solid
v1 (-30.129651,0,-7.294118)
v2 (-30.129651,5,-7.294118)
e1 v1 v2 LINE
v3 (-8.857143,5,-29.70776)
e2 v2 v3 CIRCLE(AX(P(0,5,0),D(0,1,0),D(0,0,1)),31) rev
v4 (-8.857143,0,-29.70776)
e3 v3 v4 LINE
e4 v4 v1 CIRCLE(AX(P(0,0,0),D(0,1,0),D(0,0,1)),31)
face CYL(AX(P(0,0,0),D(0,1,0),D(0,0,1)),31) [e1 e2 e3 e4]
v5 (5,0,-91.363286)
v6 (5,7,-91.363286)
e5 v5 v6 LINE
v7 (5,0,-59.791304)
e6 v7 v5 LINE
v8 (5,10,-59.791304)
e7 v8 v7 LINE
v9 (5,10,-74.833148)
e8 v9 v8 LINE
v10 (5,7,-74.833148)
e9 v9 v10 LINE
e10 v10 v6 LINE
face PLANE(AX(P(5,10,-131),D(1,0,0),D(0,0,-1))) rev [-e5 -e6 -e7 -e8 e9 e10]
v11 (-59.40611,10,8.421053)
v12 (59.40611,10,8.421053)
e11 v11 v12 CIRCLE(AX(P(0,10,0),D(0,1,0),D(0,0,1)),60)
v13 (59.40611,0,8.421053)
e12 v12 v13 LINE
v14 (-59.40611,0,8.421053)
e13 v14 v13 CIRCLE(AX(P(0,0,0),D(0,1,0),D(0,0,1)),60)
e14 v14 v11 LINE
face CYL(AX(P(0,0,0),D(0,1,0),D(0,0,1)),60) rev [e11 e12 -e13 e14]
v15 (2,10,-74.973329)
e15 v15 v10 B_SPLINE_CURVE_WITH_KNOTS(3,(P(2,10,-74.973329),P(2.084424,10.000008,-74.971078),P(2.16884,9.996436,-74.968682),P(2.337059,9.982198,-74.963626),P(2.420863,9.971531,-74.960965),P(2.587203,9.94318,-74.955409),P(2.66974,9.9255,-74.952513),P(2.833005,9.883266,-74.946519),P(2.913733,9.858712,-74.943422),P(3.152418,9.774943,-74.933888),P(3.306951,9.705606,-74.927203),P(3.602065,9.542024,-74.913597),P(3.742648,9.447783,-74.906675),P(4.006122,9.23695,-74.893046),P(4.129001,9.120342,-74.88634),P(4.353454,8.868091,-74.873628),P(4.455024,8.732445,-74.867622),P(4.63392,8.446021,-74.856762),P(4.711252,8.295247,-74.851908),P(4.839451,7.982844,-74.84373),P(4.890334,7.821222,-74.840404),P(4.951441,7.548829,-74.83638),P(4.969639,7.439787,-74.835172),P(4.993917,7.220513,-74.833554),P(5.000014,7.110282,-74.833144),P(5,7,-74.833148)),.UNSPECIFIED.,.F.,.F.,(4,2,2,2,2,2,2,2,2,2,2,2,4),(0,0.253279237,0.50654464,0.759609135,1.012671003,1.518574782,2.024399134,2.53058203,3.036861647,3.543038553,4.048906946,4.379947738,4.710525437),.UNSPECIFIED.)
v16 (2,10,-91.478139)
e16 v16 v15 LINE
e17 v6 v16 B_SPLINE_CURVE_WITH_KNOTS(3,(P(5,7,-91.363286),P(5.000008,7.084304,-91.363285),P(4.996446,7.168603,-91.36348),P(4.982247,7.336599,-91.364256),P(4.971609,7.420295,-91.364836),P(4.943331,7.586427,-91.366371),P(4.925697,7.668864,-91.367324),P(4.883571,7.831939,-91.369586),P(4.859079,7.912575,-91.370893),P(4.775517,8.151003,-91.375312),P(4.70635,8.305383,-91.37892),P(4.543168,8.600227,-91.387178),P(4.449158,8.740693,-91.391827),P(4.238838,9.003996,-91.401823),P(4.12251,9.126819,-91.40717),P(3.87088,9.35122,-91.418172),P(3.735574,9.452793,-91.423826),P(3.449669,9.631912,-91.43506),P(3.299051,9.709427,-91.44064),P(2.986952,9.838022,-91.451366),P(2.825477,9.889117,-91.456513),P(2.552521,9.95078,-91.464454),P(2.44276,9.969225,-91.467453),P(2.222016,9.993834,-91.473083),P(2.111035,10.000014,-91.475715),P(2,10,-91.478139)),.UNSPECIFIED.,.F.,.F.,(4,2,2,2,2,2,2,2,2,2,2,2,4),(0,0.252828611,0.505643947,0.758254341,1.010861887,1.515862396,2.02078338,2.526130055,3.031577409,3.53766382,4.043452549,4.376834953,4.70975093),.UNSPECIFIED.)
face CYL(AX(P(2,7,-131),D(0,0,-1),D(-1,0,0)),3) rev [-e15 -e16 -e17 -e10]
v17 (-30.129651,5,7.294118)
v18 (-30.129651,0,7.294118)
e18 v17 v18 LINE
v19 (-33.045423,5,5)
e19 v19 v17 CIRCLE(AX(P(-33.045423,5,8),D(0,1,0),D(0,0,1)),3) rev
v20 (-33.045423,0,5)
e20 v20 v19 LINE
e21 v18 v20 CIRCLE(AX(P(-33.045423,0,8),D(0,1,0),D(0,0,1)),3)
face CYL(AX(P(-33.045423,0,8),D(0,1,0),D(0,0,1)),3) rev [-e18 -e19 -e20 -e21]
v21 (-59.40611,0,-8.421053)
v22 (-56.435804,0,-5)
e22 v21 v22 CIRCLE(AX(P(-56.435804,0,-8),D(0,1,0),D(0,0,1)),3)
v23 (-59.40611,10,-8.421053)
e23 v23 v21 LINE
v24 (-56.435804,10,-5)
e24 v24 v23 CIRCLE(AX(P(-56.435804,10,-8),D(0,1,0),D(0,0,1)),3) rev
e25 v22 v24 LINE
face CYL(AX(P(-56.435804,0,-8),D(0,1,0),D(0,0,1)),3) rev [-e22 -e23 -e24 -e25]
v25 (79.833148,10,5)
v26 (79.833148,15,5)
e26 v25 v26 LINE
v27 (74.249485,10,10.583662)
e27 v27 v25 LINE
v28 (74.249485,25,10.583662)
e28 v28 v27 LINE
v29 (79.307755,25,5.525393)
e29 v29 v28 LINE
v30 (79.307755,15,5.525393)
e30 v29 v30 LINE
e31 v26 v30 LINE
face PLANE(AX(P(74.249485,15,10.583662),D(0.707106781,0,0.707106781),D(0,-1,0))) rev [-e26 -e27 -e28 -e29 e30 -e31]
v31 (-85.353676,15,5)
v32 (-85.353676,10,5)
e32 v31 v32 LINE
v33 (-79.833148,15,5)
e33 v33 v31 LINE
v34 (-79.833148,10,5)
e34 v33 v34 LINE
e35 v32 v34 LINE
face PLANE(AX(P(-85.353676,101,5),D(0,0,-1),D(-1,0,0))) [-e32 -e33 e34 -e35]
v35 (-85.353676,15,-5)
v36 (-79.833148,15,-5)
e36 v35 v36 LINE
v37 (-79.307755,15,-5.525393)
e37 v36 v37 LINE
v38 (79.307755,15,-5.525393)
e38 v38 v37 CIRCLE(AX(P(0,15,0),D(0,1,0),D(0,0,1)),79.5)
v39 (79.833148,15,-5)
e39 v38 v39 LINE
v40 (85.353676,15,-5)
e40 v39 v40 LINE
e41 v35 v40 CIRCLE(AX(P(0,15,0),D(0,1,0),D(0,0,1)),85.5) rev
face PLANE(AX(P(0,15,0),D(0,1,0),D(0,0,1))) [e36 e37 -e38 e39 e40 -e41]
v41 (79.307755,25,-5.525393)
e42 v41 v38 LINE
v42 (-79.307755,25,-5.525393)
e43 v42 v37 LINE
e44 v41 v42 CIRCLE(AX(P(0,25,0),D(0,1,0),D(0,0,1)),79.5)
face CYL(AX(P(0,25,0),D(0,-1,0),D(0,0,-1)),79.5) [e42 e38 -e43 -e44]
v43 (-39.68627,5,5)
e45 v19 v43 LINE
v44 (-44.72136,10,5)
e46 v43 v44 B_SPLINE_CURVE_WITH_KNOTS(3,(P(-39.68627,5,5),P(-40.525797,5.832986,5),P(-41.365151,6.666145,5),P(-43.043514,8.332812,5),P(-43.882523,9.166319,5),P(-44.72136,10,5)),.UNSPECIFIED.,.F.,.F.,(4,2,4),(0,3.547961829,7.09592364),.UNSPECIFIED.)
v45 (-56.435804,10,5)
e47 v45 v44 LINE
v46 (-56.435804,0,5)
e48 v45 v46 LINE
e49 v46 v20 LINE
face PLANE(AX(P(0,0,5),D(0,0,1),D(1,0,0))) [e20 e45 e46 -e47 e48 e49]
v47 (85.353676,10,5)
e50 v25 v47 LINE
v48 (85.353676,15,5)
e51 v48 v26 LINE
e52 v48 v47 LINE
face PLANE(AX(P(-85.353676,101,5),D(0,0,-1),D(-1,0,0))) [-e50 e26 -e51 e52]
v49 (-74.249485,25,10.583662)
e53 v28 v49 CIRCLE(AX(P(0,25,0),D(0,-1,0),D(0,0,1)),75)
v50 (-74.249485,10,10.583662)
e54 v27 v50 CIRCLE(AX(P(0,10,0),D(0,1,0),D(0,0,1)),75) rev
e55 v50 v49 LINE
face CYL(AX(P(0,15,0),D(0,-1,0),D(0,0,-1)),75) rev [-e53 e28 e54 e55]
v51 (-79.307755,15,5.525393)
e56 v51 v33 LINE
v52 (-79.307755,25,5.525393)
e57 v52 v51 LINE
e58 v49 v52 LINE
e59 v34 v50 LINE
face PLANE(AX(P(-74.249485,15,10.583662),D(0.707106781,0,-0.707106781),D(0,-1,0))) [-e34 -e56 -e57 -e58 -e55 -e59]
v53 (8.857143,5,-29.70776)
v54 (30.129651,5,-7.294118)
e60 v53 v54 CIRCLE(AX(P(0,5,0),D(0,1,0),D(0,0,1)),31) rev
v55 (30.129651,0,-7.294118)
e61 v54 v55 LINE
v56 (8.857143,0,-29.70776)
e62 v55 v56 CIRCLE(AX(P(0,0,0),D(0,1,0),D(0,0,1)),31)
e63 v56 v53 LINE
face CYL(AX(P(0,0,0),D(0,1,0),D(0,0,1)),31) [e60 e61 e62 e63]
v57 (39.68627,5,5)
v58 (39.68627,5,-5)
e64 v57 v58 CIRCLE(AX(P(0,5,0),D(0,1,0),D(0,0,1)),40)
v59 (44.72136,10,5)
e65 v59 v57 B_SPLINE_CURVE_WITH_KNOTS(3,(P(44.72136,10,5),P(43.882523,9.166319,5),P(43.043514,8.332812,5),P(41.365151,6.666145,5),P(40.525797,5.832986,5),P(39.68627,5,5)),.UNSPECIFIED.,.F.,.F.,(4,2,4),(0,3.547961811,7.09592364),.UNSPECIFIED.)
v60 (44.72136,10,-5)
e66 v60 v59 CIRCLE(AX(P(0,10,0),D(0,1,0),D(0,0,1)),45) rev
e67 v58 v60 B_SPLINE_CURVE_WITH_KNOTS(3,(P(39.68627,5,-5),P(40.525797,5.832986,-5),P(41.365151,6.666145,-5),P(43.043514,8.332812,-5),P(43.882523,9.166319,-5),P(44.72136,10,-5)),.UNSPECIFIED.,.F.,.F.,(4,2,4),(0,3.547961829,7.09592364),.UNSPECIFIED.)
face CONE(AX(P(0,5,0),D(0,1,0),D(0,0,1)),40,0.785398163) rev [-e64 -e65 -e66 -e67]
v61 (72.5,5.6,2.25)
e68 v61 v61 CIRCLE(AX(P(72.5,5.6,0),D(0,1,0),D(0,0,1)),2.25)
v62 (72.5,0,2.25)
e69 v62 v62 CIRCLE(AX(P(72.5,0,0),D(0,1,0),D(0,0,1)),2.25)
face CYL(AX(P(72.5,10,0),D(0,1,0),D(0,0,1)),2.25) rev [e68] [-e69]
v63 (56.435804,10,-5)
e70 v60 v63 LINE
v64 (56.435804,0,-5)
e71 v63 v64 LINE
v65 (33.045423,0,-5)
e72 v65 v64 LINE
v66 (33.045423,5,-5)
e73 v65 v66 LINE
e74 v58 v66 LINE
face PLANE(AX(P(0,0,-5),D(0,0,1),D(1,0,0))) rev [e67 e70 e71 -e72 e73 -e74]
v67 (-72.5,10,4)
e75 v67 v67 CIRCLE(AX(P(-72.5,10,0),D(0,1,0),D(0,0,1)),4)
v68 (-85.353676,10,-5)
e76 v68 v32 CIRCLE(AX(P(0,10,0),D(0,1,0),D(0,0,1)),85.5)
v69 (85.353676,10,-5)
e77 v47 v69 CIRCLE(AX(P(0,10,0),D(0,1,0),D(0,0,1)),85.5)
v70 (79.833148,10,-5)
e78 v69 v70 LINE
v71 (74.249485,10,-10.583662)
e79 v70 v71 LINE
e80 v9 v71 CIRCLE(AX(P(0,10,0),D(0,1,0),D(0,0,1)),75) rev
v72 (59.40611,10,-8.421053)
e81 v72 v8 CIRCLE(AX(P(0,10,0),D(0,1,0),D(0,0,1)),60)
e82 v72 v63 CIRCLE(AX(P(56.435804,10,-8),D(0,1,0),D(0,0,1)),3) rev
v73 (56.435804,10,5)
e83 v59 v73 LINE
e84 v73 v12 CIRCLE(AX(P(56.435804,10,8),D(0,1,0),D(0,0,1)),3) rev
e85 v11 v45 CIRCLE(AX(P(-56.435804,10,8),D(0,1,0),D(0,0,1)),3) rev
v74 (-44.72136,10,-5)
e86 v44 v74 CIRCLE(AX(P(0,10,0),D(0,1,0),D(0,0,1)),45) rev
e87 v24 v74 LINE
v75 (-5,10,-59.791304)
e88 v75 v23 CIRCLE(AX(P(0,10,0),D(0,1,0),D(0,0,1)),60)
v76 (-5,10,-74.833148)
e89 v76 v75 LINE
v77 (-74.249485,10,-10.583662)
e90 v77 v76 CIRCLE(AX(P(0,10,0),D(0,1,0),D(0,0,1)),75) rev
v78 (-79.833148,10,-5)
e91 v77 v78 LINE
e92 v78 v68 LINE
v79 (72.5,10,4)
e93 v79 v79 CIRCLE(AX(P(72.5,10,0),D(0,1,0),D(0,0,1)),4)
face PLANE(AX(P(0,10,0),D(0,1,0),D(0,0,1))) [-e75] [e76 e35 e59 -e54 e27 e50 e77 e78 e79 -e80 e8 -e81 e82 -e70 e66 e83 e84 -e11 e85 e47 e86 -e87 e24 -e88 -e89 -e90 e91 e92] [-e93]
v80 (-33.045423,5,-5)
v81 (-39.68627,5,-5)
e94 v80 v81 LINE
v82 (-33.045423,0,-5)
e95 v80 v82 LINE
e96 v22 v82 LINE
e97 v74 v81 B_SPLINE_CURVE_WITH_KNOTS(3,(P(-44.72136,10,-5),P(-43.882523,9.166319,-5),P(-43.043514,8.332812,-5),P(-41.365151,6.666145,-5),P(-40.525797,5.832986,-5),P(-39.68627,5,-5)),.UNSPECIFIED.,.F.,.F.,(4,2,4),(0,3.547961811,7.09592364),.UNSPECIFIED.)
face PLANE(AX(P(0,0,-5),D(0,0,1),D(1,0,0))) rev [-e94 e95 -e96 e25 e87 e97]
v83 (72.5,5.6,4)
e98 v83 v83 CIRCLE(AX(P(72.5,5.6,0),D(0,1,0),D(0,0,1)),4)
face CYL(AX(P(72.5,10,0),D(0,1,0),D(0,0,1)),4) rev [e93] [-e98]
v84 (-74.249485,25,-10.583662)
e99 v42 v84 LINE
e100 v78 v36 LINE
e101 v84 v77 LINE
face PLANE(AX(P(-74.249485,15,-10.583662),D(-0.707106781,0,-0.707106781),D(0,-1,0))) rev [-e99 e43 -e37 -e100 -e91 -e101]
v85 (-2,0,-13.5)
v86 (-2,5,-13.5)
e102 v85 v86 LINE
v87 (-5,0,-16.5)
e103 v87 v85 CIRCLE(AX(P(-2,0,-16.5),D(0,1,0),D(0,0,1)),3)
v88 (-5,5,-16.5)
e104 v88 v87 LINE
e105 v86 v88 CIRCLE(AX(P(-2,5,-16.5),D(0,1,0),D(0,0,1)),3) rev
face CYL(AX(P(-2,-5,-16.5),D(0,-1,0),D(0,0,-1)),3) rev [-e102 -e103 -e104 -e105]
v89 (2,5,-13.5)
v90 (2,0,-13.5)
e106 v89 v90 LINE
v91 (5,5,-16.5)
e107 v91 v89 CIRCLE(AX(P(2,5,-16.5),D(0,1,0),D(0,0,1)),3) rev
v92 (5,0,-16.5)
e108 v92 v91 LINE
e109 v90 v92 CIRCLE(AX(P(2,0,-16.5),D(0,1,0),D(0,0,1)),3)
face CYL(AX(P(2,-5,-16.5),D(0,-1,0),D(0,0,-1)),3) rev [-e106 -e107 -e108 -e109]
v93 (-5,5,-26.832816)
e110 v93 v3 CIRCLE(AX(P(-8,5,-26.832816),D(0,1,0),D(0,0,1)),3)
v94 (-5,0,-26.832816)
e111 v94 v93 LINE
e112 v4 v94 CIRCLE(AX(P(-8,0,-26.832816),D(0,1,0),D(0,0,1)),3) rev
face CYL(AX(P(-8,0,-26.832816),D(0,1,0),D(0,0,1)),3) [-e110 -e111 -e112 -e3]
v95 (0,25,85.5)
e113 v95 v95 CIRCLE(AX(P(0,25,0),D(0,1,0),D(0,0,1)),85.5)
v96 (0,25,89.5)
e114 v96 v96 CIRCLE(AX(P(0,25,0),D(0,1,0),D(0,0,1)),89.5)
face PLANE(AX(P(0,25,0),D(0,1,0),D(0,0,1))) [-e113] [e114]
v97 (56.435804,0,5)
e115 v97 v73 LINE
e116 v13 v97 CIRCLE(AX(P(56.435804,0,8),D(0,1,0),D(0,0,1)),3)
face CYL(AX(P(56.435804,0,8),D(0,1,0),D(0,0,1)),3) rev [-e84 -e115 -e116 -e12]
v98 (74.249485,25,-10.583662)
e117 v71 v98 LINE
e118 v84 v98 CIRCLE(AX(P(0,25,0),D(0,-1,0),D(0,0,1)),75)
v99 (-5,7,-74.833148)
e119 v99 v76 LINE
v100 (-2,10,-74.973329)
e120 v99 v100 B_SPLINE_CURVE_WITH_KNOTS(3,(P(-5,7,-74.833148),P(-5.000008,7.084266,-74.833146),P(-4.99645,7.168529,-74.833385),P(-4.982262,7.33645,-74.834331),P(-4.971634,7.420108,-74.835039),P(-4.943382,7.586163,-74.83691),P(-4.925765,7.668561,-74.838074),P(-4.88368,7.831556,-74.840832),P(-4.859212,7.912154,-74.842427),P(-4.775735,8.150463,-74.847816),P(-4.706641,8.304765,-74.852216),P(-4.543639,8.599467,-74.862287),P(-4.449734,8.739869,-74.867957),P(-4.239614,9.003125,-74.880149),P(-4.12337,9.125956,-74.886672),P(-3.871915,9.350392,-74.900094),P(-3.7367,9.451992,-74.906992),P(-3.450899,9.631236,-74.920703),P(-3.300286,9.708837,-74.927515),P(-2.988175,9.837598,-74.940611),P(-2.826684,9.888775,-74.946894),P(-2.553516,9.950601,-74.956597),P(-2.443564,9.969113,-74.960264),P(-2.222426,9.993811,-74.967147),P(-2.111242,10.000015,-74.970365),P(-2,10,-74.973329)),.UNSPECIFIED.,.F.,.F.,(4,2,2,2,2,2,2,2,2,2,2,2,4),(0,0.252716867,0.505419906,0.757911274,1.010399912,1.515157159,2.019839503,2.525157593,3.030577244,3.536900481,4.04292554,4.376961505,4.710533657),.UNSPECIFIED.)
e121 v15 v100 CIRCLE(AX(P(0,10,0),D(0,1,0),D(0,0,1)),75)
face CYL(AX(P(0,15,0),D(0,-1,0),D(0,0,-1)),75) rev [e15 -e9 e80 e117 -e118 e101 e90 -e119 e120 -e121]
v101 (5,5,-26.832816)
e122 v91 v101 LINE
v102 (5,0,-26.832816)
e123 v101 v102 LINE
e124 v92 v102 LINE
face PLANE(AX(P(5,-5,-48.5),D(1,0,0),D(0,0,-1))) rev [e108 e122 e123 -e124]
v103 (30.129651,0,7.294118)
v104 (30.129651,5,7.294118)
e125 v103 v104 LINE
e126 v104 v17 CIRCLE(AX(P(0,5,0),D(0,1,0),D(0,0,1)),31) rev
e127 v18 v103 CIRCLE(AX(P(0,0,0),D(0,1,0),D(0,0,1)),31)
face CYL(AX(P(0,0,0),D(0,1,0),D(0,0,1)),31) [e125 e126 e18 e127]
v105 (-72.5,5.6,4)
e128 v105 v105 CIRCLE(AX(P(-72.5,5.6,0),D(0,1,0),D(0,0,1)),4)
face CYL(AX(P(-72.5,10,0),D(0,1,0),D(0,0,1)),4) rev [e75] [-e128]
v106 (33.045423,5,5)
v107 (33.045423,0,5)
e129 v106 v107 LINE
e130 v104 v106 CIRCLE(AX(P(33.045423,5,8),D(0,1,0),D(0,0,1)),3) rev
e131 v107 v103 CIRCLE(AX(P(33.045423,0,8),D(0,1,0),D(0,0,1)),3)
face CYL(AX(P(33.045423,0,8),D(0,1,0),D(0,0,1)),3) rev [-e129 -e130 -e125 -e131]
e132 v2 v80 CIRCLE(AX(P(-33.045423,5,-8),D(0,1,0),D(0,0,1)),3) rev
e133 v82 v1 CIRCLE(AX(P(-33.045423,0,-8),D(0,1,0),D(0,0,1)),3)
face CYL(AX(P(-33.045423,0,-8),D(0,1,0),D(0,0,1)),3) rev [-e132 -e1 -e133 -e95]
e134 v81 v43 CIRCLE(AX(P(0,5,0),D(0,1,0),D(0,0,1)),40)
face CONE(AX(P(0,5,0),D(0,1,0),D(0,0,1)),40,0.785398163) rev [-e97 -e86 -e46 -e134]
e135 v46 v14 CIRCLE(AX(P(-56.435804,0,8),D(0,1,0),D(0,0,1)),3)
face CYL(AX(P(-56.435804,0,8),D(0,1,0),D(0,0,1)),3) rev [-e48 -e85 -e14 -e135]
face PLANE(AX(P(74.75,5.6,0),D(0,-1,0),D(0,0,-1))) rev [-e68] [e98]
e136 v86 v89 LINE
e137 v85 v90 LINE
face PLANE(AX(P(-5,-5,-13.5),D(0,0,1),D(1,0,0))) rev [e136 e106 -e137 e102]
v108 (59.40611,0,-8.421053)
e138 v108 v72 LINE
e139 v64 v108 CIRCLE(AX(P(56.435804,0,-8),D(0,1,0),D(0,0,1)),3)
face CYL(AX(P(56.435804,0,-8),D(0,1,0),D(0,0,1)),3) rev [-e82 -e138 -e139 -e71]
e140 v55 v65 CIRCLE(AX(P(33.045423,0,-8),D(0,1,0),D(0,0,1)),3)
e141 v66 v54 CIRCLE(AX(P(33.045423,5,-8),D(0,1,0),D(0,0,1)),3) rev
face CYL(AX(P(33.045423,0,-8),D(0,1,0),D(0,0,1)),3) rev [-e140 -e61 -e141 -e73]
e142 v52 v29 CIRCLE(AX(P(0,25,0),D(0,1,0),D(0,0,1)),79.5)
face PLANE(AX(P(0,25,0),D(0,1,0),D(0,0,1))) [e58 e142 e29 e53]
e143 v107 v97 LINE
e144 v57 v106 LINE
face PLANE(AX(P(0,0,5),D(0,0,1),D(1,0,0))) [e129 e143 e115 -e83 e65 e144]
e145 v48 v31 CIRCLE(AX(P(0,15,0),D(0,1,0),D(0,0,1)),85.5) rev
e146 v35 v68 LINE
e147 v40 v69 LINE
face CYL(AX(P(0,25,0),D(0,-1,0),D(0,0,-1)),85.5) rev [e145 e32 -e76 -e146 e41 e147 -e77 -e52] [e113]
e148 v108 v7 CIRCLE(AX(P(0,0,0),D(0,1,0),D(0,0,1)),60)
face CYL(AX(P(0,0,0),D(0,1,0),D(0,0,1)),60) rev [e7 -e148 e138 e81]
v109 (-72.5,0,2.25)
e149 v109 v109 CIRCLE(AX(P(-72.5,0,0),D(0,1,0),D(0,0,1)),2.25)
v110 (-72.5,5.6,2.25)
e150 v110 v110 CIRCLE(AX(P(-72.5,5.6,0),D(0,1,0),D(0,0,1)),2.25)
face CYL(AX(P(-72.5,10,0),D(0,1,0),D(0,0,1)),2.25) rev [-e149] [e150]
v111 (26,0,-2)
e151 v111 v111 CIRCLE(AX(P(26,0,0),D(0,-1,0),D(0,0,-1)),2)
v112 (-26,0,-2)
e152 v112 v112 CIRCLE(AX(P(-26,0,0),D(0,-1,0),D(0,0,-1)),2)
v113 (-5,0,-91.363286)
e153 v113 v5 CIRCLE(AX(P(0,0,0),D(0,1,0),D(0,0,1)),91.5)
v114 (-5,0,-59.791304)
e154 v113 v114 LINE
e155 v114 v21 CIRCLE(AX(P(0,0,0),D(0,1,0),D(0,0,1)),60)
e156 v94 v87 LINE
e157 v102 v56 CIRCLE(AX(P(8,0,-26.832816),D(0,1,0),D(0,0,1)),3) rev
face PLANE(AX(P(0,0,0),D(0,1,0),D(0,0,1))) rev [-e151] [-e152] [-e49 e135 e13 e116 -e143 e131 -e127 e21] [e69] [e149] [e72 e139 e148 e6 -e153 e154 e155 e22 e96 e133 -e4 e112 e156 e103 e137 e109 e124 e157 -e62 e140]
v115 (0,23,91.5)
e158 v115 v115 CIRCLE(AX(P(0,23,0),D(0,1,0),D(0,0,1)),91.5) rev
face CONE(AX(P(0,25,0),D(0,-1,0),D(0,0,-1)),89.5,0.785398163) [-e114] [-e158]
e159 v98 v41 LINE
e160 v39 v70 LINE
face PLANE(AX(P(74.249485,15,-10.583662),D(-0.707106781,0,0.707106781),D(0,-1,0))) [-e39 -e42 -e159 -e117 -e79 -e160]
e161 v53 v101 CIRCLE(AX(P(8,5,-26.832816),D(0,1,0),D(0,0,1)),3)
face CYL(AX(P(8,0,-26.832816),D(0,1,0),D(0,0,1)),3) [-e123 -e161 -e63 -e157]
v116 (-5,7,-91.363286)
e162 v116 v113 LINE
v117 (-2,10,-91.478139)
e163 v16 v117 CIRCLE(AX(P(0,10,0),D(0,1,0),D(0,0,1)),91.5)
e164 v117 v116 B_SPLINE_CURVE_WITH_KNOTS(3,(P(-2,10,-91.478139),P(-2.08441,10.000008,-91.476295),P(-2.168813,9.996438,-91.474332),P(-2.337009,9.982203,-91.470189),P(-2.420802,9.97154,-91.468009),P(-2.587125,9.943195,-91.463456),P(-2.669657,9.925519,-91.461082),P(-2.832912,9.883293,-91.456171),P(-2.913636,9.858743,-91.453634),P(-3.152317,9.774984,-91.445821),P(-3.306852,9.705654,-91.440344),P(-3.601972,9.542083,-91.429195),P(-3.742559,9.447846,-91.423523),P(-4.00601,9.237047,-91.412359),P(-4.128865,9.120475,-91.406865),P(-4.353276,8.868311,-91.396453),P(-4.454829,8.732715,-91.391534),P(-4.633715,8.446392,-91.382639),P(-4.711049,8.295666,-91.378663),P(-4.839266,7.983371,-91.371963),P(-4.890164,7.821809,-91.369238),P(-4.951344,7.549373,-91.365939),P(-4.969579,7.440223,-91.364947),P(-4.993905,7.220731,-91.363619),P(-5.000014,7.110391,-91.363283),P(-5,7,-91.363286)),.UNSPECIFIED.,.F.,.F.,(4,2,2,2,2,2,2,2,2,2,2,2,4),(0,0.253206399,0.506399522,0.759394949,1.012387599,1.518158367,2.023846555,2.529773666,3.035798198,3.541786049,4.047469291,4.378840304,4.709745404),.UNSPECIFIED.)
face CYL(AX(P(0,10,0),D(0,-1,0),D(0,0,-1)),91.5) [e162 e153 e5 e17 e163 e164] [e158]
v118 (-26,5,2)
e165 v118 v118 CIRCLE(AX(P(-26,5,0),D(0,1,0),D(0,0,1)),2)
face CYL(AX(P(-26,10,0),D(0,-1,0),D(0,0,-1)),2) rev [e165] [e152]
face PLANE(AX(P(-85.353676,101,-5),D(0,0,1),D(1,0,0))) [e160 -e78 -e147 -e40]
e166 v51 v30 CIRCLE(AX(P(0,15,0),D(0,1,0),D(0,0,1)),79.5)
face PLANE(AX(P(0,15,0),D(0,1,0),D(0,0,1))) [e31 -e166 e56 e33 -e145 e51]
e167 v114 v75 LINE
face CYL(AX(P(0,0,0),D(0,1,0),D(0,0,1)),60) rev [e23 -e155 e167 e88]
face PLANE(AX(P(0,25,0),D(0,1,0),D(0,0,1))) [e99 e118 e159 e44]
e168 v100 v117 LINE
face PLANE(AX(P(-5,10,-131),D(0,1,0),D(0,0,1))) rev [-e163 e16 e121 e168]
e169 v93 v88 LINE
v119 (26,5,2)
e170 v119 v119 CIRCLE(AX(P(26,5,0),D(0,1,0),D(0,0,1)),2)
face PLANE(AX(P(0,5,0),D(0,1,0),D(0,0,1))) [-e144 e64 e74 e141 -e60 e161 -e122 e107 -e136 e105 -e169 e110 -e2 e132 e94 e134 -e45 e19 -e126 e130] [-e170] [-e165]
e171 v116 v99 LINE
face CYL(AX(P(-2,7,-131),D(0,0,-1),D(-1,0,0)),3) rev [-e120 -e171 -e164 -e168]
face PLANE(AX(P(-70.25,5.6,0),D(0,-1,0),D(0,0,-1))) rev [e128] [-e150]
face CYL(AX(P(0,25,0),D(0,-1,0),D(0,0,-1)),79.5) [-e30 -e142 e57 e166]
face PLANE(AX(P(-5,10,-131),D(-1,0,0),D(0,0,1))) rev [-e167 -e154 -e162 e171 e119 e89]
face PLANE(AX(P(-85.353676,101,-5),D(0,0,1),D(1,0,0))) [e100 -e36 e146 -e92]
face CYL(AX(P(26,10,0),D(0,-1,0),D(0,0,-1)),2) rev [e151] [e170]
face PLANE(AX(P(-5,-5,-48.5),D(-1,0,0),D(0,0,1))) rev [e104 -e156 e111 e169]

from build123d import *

# Parameters (mm, degrees)
SKETCH1_R                                           = 91.5
BOSS_EXTRUDE1_DEPTH                                 = 10
CUT_EXTRUDE1_DEPTH                                  = 130.78636292
SKETCH3_R                                           = 40
CUT_EXTRUDE2_DEPTH                                  = 5
SKETCH4_R                                           = 91.5
SKETCH4_R_2                                         = 75
BOSS_EXTRUDE2_DEPTH                                 = 5
SKETCH5_R                                           = 91.5
SKETCH5_R_2                                         = 85.5
BOSS_EXTRUDE3_DEPTH                                 = 10
CHAMFER1_SIZE                                       = 2
F_4_5_4_5_DIAMETER_HOLE1_D                          = 4.5
CUT_EXTRUDE3_DEPTH                                  = 91
FILLET1_R                                           = 3
CHAMFER2_SIZE                                       = 5
CHAMFER3_SIZE                                       = 5
SKETCH10_W                                          = 10
SKETCH10_H                                          = 20
CUT_EXTRUDE4_DEPTH                                  = 91
FILLET2_R                                           = 3
FILLET3_R                                           = 3
BOSS_EXTRUDE4_DEPTH                                 = 10
SKETCH12_W                                          = 10
SKETCH12_H                                          = 35
CUT_EXTRUDE5_DEPTH                                  = 10
FILLET4_R                                           = 3
SKETCH13_R                                          = 2
CUT_EXTRUDE6_DEPTH                                  = 10
CBORE_FOR_M4_HEX_SOCKET_HEAD_CAP_SCREW1_D           = 4.5
CBORE_FOR_M4_HEX_SOCKET_HEAD_CAP_SCREW1_CBORE_D     = 8
CBORE_FOR_M4_HEX_SOCKET_HEAD_CAP_SCREW1_CBORE_DEPTH = 4.4


# Some blends are built 0.0001 mm under size
with BuildPart() as part:
    # Sketch1 → Boss-Extrude1 (new body)
    with BuildSketch(Plane(origin=(0, 0, 0), x_dir=(1, 0, 0), z_dir=(0, 1, 0))):
        with Locations(Location((0, 0, 0), (0, 0, 270))):
            Circle(SKETCH1_R)
    extrude(amount=BOSS_EXTRUDE1_DEPTH)

    # Sketch2 → Cut-Extrude1 (cut, through all)
    with BuildSketch(Plane(origin=(0, 10, 0), x_dir=(1, 0, 0), z_dir=(0, 1, 0))):
        with BuildLine():
            ThreePointArc((59.791303716, 5), (0, 60), (-59.791303716, 5))
            Line((-59.791303716, 5), (-30.594117082, 5))
            ThreePointArc((-30.594117082, 5), (0, 31), (30.594117082, 5))
            Line((30.594117082, 5), (59.791303716, 5))
        make_face()
        with BuildLine():
            Line((-30.594117082, -5), (-59.791303716, -5))
            ThreePointArc((-59.791303716, -5), (0, -60), (59.791303716, -5))
            Line((59.791303716, -5), (30.594117082, -5))
            ThreePointArc((30.594117082, -5), (0, -31), (-30.594117082, -5))
        make_face()
    extrude(amount=-CUT_EXTRUDE1_DEPTH, mode=Mode.SUBTRACT)

    # Sketch3 → Cut-Extrude2 (cut)
    with BuildSketch(Plane(origin=(0, 10, 0), x_dir=(1, 0, 0), z_dir=(0, 1, 0))):
        Circle(SKETCH3_R)
    extrude(amount=-CUT_EXTRUDE2_DEPTH, mode=Mode.SUBTRACT)

    # Sketch4 → Boss-Extrude2 (add)
    with BuildSketch(Plane(origin=(0, 10, 0), x_dir=(1, 0, 0), z_dir=(0, 1, 0))):
        with Locations(Location((0, 0, 0), (0, 0, 270))):
            Circle(SKETCH4_R)
        with Locations(Location((0, 0, 0), (0, 0, 270))):
            Circle(SKETCH4_R_2, mode=Mode.SUBTRACT)
    extrude(amount=BOSS_EXTRUDE2_DEPTH)

    # Sketch5 → Boss-Extrude3 (add)
    with BuildSketch(Plane(origin=(0, 15, 0), x_dir=(1, 0, 0), z_dir=(0, 1, 0))):
        with Locations(Location((0, 0, 0), (0, 0, 270))):
            Circle(SKETCH5_R)
        with Locations(Location((0, 0, 0), (0, 0, 270))):
            Circle(SKETCH5_R_2, mode=Mode.SUBTRACT)
    extrude(amount=BOSS_EXTRUDE3_DEPTH)

    # Chamfer1
    chamfer1_edges = [part.edges().sort_by_distance(p)[0] for p in [
        (0, 25, -91.5),
    ]]
    chamfer(chamfer1_edges, length=CHAMFER1_SIZE)

    # Ø4.5 (4.5) Diameter Hole1 (through all)
    with Locations(Plane(origin=(0, 10, 0), x_dir=(1, 0, 0), z_dir=(0, 1, 0))):
        with Locations((-72.5, 0), (72.5, 0)):
            Hole(F_4_5_4_5_DIAMETER_HOLE1_D / 2)

    # Sketch9 → Cut-Extrude3 (cut)
    with BuildSketch(Plane(origin=(0, 10, 0), x_dir=(1, 0, 0), z_dir=(0, 1, 0))):
        with BuildLine():
            Line((-85.353675961, 5), (85.353675961, 5))
            ThreePointArc((85.353675961, 5), (85.5, 0), (85.353675961, -5))
            Line((85.353675961, -5), (-85.353675961, -5))
            ThreePointArc((-85.353675961, -5), (-85.5, 0), (-85.353675961, 5))
        make_face()
    extrude(amount=CUT_EXTRUDE3_DEPTH, mode=Mode.SUBTRACT)

    # Fillet1
    fillet1_edges = [part.edges().sort_by_distance(p)[0] for p in [
        (-59.791303716, 5, -5),
        (59.791303716, 5, -5),
        (59.791303716, 5, 5),
        (-59.791303716, 5, 5),
    ]]
    fillet(fillet1_edges, radius=FILLET1_R)

    # Chamfer2
    chamfer2_edges = [part.edges().sort_by_distance(p)[0] for p in [
        (-40, 10, 0),
        (40, 10, 0),
    ]]
    chamfer(chamfer2_edges, length=CHAMFER2_SIZE - 0.0001)  # a hair under: the kernel refuses the full size

    # Chamfer3
    # the kernel refuses this chamfer: 5.369942673, 5 mm, written as the material it takes off along each edge
    with BuildSketch(Plane(origin=(-74.833147735, 29.456298598, -5), x_dir=(0.10396392346922531, 0, -0.9945810689013164), z_dir=(0, -1, 0))) as chamfer3_piece_1:
        with BuildLine():
            Line((5.614084599, 0), (-CHAMFER3_SIZE * 0.103963923469, -CHAMFER3_SIZE * 0.994581068901))
            Line((-CHAMFER3_SIZE * 0.103963923469, -CHAMFER3_SIZE * 0.994581068901), (0, 0))
            ThreePointArc((0, 0), (2.890602355, -0.05250177), (5.614084599, 0))
        make_face()
    extrude(amount=19.456298598, mode=Mode.SUBTRACT)
    with BuildSketch(Plane(origin=(-74.833147735, 29.456298598, 5), x_dir=(-1, 0, 0), z_dir=(0, -1, 0)), Plane(origin=(74.833147735, 29.456298598, -5), x_dir=(1, 0, 0), z_dir=(0, -1, 0))) as chamfer3_piece_2:
        with BuildLine():
            Line((CHAMFER3_SIZE, 0), (-0.583662262, -5.583662262))
            ThreePointArc((-0.583662262, -5.583662262), (-0.248301095, -2.88039667), (0, 0))
            Line((0, 0), (CHAMFER3_SIZE, 0))
        make_face()
    extrude(amount=19.456298598, mode=Mode.SUBTRACT)
    with BuildSketch(Plane(origin=(74.833147735, 29.456298598, 5), x_dir=(1, 0, 0), z_dir=(0, -1, 0))) as chamfer3_piece_3:
        with BuildLine():
            Line((CHAMFER3_SIZE, 0), (-0.583662262, 5.583662262))
            ThreePointArc((-0.583662262, 5.583662262), (-0.248301095, 2.88039667), (0, 0))
            Line((0, 0), (CHAMFER3_SIZE, 0))
        make_face()
    extrude(amount=19.456298598, mode=Mode.SUBTRACT)

    # Sketch10 → Cut-Extrude4 (cut)
    with BuildSketch(Plane.XY.offset(-40)):
        Rectangle(SKETCH10_W, SKETCH10_H)
    extrude(amount=-CUT_EXTRUDE4_DEPTH, mode=Mode.SUBTRACT)

    # Fillet2
    fillet2_edges = [part.edges().sort_by_distance(p)[0] for p in [
        (5, 10, -83.098216789),
        (-5, 10, -83.098216789),
    ]]
    fillet(fillet2_edges, radius=FILLET2_R)

    # Fillet3
    fillet3_edges = [part.edges().sort_by_distance(p)[0] for p in [
        (-30.594117082, 2.5, -5),
        (-30.594117082, 2.5, 5),
        (30.594117082, 2.5, 5),
        (30.594117082, 2.5, -5),
    ]]
    fillet(fillet3_edges, radius=FILLET3_R)

    # Sketch11 → Boss-Extrude4 (add)
    with BuildSketch(Plane(origin=(0, 15, 0), x_dir=(1, 0, 0), z_dir=(0, 1, 0))):
        with BuildLine():
            Line((-74.249485474, 10.583662262), (-79.307755217, 5.525392519))
            ThreePointArc((-79.307755217, 5.525392519), (0, 79.5), (79.307755217, 5.525392519))
            Line((79.307755217, 5.525392519), (74.249485474, 10.583662262))
            ThreePointArc((74.249485474, 10.583662262), (0, 75), (-74.249485474, 10.583662262))
        make_face()
        with BuildLine():
            Line((-74.249485474, -10.583662262), (-79.307755217, -5.525392519))
            ThreePointArc((-79.307755217, -5.525392519), (0, -79.5), (79.307755217, -5.525392519))
            Line((79.307755217, -5.525392519), (74.249485474, -10.583662262))
            ThreePointArc((74.249485474, -10.583662262), (0, -75), (-74.249485474, -10.583662262))
        make_face()
    extrude(amount=BOSS_EXTRUDE4_DEPTH)

    # Sketch12 → Cut-Extrude5 (cut)
    with BuildSketch(Plane(origin=(0, 5, 0), x_dir=(1, 0, 0), z_dir=(0, 1, 0))):
        with Locations((0, 31)):
            Rectangle(SKETCH12_W, SKETCH12_H)
    extrude(amount=-CUT_EXTRUDE5_DEPTH, mode=Mode.SUBTRACT)

    # Fillet4
    fillet4_edges = [part.edges().sort_by_distance(p)[0] for p in [
        (5, 2.5, -30.594117082),
        (5, 2.5, -13.5),
        (-5, 2.5, -30.594117082),
        (-5, 2.5, -13.5),
    ]]
    fillet(fillet4_edges, radius=FILLET4_R)

    # Sketch13 → Cut-Extrude6 (cut)
    with BuildSketch(Plane(origin=(0, 0, 0), x_dir=(-1, 0, 0), z_dir=(0, -1, 0))):
        with Locations(Location((26, 0, 0), (0, 0, 90))):
            Circle(SKETCH13_R)
        with Locations(Location((-26, 0, 0), (0, 0, 90))):
            Circle(SKETCH13_R)
    extrude(amount=-CUT_EXTRUDE6_DEPTH, mode=Mode.SUBTRACT)

    # CBORE for M4 Hex Socket Head Cap Screw1 (through all)
    with Locations(Plane(origin=(0, 10, 0), x_dir=(1, 0, 0), z_dir=(0, 1, 0))):
        with Locations((-72.5, 0), (72.5, 0)):
            CounterBoreHole(CBORE_FOR_M4_HEX_SOCKET_HEAD_CAP_SCREW1_D / 2, CBORE_FOR_M4_HEX_SOCKET_HEAD_CAP_SCREW1_CBORE_D / 2, CBORE_FOR_M4_HEX_SOCKET_HEAD_CAP_SCREW1_CBORE_DEPTH)


solid = part.part
